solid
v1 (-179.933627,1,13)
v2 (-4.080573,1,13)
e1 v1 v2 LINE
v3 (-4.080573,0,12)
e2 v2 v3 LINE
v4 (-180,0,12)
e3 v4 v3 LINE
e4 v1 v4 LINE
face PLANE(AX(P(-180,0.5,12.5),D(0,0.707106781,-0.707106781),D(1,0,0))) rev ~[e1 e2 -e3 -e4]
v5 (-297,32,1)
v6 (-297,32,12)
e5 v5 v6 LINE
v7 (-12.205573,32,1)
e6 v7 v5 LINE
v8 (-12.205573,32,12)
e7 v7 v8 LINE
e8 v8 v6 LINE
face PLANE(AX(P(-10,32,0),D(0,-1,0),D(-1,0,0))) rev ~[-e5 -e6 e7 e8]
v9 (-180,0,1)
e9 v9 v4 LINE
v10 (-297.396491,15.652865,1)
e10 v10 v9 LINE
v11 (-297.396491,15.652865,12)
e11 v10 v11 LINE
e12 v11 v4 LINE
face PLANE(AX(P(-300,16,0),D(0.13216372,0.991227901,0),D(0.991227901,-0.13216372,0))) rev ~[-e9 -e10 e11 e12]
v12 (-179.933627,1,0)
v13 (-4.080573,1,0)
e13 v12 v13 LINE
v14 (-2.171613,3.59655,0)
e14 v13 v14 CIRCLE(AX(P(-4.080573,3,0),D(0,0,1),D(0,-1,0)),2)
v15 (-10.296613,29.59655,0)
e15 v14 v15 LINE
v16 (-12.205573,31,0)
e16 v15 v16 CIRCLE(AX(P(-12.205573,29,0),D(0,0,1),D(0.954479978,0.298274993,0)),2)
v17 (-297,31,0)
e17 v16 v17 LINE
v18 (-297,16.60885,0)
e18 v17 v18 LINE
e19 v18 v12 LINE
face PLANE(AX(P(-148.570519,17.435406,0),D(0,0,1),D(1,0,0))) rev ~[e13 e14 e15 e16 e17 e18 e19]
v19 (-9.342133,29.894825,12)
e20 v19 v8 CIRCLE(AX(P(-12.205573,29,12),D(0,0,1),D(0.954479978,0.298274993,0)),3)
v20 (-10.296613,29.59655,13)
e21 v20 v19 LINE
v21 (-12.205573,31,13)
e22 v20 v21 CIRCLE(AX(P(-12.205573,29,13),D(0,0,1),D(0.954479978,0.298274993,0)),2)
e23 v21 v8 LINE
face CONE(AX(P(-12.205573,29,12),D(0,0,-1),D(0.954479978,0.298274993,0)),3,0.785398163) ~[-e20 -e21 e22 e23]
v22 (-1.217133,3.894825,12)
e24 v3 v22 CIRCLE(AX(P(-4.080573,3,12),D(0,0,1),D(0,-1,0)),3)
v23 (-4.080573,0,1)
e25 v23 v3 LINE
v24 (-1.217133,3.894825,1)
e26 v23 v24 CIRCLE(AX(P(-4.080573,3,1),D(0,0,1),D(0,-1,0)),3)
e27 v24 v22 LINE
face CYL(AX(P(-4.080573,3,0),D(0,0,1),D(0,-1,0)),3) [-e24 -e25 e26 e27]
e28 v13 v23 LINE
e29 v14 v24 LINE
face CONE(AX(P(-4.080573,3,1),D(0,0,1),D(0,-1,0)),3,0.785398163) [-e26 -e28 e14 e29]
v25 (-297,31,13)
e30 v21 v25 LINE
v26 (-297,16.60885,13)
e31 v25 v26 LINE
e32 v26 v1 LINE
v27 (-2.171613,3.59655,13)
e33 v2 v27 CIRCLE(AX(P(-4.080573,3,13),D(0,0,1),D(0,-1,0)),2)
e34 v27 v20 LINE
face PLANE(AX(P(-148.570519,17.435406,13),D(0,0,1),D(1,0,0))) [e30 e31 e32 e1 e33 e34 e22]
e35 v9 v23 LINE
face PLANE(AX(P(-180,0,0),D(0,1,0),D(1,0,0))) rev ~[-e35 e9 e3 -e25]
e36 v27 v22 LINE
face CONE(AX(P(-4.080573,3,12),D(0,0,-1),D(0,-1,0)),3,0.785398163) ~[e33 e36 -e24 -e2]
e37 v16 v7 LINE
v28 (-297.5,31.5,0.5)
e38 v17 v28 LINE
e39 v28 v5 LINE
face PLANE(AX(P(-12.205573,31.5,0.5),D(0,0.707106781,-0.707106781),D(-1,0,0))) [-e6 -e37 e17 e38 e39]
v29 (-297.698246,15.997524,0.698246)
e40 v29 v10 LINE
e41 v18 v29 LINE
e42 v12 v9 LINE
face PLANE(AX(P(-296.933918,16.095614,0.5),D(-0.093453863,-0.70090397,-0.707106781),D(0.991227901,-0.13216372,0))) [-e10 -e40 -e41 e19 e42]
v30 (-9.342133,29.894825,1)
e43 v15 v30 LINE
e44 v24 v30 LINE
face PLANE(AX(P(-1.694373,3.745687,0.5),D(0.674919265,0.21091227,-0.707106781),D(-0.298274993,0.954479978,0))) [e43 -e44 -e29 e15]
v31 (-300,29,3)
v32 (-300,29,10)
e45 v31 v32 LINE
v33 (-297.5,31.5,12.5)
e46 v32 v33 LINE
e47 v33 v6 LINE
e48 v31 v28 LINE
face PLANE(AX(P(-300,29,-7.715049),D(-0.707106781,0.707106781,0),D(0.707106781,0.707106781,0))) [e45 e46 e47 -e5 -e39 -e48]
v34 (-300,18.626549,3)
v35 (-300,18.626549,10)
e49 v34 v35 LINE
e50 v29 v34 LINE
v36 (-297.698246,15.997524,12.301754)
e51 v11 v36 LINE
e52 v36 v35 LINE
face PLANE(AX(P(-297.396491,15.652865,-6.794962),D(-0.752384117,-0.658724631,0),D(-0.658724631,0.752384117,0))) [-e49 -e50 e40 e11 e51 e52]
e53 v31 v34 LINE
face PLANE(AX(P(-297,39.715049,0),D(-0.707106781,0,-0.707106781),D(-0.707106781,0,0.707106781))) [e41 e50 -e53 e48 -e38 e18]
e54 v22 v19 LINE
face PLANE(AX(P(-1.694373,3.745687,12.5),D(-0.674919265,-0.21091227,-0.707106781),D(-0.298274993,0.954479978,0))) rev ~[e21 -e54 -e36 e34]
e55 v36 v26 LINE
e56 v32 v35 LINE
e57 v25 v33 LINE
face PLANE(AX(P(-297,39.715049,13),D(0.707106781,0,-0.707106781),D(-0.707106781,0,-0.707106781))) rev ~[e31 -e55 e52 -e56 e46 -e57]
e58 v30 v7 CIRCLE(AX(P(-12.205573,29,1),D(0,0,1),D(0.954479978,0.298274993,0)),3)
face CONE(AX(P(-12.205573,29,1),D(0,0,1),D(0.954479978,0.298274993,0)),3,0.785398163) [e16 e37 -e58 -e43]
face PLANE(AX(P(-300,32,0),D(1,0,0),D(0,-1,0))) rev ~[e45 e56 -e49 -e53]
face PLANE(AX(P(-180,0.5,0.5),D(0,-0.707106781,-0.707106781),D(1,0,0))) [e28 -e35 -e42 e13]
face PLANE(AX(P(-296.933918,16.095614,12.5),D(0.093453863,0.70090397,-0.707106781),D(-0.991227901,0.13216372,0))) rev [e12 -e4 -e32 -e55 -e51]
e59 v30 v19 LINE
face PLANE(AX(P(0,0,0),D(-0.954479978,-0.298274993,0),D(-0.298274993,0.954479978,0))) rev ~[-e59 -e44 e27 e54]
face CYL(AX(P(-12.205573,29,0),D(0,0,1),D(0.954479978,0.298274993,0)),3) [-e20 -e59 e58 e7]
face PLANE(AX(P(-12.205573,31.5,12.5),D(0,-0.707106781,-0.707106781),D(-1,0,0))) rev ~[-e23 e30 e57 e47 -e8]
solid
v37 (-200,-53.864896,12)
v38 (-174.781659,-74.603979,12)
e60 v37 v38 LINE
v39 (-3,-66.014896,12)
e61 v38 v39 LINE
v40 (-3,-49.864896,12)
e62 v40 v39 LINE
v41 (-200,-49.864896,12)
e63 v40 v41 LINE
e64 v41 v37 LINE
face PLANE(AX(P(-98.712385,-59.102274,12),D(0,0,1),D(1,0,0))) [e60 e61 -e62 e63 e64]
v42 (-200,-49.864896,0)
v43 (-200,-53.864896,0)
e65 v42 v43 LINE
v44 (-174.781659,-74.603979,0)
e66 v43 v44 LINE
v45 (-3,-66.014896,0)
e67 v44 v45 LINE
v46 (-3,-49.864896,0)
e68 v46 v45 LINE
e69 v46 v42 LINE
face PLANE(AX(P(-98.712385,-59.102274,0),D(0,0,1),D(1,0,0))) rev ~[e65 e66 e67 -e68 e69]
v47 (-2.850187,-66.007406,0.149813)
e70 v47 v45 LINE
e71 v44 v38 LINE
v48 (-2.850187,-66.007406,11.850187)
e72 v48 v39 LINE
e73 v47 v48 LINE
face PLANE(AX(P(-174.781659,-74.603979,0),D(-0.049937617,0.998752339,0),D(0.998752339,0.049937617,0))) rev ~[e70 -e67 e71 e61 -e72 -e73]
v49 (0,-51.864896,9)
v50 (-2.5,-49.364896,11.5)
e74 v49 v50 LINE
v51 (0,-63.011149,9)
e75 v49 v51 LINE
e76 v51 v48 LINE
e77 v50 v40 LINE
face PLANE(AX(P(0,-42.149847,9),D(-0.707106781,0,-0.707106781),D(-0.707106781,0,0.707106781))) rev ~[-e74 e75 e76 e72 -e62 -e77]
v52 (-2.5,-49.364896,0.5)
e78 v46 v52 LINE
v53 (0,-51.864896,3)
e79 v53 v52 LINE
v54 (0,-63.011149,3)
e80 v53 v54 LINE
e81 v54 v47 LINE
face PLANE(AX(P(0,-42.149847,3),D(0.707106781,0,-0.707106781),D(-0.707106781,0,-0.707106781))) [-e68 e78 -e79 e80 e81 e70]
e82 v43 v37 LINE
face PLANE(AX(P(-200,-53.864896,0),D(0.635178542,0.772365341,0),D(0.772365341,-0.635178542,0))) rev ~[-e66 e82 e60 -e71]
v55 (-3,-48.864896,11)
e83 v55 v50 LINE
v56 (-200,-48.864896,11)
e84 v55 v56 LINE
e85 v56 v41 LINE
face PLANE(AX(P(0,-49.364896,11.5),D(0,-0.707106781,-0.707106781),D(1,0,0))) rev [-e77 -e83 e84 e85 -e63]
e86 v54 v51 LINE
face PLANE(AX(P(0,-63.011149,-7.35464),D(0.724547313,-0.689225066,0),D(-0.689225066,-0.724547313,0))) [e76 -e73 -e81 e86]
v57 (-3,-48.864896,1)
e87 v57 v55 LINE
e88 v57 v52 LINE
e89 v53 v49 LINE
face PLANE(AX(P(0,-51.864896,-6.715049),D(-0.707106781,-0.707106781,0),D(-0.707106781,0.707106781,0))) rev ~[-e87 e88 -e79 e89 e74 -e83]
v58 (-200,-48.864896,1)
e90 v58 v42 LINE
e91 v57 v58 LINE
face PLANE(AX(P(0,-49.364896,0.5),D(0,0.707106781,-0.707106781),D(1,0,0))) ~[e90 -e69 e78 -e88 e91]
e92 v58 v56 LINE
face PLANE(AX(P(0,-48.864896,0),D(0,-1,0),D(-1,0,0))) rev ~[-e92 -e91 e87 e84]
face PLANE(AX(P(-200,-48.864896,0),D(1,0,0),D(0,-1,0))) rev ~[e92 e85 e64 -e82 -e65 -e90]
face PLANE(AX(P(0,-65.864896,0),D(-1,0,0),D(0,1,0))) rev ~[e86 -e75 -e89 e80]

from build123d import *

# Parameters (mm, degrees)
F1_DEPTH    = 13
F2_R        = 3
F3_T1_DEPTH = 31.4300979278
F3_T3_DEPTH = 28.4300979278
F3_T5_DEPTH = 26.5899249285
F4_SIZE     = 1
F6_DEPTH    = 12
F7_SIZE     = 1
F8_T1_DEPTH = 31.4300979278
F8_T3_DEPTH = 25.4300979278
F8_T5_DEPTH = 26.709280871


# Not quite as in the source:
# - a fillet or chamfer that OpenCascade refuses, or shapes differently, is made with other operations: its cross-section is extruded or revolved along the edge and cut away or added


with BuildPart() as f1:
    # F0 (on Top) → F1 (new body)
    with BuildSketch(Plane.XY):
        Polygon((-180, 0), (0, 0), (-10, 32), (-300, 32), (-300, 16), align=None)
    extrude(amount=F1_DEPTH)

    # F2
    f2_edges = [f1.edges().sort_by_distance(p)[0] for p in [
        (-10, 32, 6.5),
        (0, 0, 6.5),
    ]]
    fillet(f2_edges, radius=F2_R)

    # F3: chamfer of 3 on 4 edges, made by hand

    # F3_s2 → F3_t1 (cut)
    with BuildSketch(Plane.XZ.offset(-39.7150489639)):
        Polygon((-297, 13), (-300, 10), (-300, 13), align=None)
        Polygon((-297, 0), (-300, 3), (-300, 0), align=None)
    extrude(amount=F3_T1_DEPTH, mode=Mode.SUBTRACT)

    # F3_s4 → F3_t3 (cut)
    with BuildSketch(Plane.XY.offset(-7.7150489639)):
        Polygon((-300, 29), (-297, 32), (-300, 32), align=None)
    extrude(amount=F3_T3_DEPTH, mode=Mode.SUBTRACT)

    # F3_s6 → F3_t5 (cut)
    with BuildSketch(Plane.XY.offset(-6.7949624643)):
        Polygon((-297.3964911603, 15.652865488), (-300, 18.6265491901), (-300, 16), align=None)
    extrude(amount=F3_T5_DEPTH, mode=Mode.SUBTRACT)

    # F4
    f4_edges = [f1.edges().sort_by_distance(p)[0] for p in [
        (-154.602786, 32, 13),
        (-154.602786, 32, 0),
        (-238.5, 7.8, 13),
        (-92.040286, 0, 13),
        (-238.5, 7.8, 0),
        (-92.040286, 0, 0),
    ]]
    chamfer(f4_edges, length=F4_SIZE)


with BuildPart() as f6:
    # F5 (on Top) → F6 (new body)
    with BuildSketch(Plane.XY):
        Polygon((-174.7816593036, -74.6039791434), (0, -65.8648961782), (0, -48.8648961782), (-200, -48.8648961782), (-200, -53.8648961782), align=None)
    extrude(amount=F6_DEPTH)

    # F7
    f7_edges = [f6.edges().sort_by_distance(p)[0] for p in [
        (-100, -48.864896, 12),
        (-100, -48.864896, 0),
    ]]
    chamfer(f7_edges, length=F7_SIZE)

    # F8: chamfer of 3 on 4 edges, made by hand

    # F8_s2 → F8_t1 (cut)
    with BuildSketch(Plane.XZ.offset(42.1498472143)):
        Polygon((0, 9), (-3, 12), (0, 12), align=None)
        Polygon((0, 3), (-3, 0), (0, 0), align=None)
    extrude(amount=F8_T1_DEPTH, mode=Mode.SUBTRACT)

    # F8_s4 → F8_t3 (cut)
    with BuildSketch(Plane.XY.offset(-6.7150489639)):
        Polygon((0, -51.8648961782), (-3, -48.8648961782), (0, -48.8648961782), align=None)
    extrude(amount=F8_T3_DEPTH, mode=Mode.SUBTRACT)

    # F8_s6 → F8_t5 (cut)
    with BuildSketch(Plane.XY.offset(-7.3546404355)):
        Polygon((0, -63.0111485191), (-2.8501871492, -66.0074055357), (0, -65.8648961782), align=None)
    extrude(amount=F8_T5_DEPTH, mode=Mode.SUBTRACT)


solid = Compound([f1.part, f6.part])
